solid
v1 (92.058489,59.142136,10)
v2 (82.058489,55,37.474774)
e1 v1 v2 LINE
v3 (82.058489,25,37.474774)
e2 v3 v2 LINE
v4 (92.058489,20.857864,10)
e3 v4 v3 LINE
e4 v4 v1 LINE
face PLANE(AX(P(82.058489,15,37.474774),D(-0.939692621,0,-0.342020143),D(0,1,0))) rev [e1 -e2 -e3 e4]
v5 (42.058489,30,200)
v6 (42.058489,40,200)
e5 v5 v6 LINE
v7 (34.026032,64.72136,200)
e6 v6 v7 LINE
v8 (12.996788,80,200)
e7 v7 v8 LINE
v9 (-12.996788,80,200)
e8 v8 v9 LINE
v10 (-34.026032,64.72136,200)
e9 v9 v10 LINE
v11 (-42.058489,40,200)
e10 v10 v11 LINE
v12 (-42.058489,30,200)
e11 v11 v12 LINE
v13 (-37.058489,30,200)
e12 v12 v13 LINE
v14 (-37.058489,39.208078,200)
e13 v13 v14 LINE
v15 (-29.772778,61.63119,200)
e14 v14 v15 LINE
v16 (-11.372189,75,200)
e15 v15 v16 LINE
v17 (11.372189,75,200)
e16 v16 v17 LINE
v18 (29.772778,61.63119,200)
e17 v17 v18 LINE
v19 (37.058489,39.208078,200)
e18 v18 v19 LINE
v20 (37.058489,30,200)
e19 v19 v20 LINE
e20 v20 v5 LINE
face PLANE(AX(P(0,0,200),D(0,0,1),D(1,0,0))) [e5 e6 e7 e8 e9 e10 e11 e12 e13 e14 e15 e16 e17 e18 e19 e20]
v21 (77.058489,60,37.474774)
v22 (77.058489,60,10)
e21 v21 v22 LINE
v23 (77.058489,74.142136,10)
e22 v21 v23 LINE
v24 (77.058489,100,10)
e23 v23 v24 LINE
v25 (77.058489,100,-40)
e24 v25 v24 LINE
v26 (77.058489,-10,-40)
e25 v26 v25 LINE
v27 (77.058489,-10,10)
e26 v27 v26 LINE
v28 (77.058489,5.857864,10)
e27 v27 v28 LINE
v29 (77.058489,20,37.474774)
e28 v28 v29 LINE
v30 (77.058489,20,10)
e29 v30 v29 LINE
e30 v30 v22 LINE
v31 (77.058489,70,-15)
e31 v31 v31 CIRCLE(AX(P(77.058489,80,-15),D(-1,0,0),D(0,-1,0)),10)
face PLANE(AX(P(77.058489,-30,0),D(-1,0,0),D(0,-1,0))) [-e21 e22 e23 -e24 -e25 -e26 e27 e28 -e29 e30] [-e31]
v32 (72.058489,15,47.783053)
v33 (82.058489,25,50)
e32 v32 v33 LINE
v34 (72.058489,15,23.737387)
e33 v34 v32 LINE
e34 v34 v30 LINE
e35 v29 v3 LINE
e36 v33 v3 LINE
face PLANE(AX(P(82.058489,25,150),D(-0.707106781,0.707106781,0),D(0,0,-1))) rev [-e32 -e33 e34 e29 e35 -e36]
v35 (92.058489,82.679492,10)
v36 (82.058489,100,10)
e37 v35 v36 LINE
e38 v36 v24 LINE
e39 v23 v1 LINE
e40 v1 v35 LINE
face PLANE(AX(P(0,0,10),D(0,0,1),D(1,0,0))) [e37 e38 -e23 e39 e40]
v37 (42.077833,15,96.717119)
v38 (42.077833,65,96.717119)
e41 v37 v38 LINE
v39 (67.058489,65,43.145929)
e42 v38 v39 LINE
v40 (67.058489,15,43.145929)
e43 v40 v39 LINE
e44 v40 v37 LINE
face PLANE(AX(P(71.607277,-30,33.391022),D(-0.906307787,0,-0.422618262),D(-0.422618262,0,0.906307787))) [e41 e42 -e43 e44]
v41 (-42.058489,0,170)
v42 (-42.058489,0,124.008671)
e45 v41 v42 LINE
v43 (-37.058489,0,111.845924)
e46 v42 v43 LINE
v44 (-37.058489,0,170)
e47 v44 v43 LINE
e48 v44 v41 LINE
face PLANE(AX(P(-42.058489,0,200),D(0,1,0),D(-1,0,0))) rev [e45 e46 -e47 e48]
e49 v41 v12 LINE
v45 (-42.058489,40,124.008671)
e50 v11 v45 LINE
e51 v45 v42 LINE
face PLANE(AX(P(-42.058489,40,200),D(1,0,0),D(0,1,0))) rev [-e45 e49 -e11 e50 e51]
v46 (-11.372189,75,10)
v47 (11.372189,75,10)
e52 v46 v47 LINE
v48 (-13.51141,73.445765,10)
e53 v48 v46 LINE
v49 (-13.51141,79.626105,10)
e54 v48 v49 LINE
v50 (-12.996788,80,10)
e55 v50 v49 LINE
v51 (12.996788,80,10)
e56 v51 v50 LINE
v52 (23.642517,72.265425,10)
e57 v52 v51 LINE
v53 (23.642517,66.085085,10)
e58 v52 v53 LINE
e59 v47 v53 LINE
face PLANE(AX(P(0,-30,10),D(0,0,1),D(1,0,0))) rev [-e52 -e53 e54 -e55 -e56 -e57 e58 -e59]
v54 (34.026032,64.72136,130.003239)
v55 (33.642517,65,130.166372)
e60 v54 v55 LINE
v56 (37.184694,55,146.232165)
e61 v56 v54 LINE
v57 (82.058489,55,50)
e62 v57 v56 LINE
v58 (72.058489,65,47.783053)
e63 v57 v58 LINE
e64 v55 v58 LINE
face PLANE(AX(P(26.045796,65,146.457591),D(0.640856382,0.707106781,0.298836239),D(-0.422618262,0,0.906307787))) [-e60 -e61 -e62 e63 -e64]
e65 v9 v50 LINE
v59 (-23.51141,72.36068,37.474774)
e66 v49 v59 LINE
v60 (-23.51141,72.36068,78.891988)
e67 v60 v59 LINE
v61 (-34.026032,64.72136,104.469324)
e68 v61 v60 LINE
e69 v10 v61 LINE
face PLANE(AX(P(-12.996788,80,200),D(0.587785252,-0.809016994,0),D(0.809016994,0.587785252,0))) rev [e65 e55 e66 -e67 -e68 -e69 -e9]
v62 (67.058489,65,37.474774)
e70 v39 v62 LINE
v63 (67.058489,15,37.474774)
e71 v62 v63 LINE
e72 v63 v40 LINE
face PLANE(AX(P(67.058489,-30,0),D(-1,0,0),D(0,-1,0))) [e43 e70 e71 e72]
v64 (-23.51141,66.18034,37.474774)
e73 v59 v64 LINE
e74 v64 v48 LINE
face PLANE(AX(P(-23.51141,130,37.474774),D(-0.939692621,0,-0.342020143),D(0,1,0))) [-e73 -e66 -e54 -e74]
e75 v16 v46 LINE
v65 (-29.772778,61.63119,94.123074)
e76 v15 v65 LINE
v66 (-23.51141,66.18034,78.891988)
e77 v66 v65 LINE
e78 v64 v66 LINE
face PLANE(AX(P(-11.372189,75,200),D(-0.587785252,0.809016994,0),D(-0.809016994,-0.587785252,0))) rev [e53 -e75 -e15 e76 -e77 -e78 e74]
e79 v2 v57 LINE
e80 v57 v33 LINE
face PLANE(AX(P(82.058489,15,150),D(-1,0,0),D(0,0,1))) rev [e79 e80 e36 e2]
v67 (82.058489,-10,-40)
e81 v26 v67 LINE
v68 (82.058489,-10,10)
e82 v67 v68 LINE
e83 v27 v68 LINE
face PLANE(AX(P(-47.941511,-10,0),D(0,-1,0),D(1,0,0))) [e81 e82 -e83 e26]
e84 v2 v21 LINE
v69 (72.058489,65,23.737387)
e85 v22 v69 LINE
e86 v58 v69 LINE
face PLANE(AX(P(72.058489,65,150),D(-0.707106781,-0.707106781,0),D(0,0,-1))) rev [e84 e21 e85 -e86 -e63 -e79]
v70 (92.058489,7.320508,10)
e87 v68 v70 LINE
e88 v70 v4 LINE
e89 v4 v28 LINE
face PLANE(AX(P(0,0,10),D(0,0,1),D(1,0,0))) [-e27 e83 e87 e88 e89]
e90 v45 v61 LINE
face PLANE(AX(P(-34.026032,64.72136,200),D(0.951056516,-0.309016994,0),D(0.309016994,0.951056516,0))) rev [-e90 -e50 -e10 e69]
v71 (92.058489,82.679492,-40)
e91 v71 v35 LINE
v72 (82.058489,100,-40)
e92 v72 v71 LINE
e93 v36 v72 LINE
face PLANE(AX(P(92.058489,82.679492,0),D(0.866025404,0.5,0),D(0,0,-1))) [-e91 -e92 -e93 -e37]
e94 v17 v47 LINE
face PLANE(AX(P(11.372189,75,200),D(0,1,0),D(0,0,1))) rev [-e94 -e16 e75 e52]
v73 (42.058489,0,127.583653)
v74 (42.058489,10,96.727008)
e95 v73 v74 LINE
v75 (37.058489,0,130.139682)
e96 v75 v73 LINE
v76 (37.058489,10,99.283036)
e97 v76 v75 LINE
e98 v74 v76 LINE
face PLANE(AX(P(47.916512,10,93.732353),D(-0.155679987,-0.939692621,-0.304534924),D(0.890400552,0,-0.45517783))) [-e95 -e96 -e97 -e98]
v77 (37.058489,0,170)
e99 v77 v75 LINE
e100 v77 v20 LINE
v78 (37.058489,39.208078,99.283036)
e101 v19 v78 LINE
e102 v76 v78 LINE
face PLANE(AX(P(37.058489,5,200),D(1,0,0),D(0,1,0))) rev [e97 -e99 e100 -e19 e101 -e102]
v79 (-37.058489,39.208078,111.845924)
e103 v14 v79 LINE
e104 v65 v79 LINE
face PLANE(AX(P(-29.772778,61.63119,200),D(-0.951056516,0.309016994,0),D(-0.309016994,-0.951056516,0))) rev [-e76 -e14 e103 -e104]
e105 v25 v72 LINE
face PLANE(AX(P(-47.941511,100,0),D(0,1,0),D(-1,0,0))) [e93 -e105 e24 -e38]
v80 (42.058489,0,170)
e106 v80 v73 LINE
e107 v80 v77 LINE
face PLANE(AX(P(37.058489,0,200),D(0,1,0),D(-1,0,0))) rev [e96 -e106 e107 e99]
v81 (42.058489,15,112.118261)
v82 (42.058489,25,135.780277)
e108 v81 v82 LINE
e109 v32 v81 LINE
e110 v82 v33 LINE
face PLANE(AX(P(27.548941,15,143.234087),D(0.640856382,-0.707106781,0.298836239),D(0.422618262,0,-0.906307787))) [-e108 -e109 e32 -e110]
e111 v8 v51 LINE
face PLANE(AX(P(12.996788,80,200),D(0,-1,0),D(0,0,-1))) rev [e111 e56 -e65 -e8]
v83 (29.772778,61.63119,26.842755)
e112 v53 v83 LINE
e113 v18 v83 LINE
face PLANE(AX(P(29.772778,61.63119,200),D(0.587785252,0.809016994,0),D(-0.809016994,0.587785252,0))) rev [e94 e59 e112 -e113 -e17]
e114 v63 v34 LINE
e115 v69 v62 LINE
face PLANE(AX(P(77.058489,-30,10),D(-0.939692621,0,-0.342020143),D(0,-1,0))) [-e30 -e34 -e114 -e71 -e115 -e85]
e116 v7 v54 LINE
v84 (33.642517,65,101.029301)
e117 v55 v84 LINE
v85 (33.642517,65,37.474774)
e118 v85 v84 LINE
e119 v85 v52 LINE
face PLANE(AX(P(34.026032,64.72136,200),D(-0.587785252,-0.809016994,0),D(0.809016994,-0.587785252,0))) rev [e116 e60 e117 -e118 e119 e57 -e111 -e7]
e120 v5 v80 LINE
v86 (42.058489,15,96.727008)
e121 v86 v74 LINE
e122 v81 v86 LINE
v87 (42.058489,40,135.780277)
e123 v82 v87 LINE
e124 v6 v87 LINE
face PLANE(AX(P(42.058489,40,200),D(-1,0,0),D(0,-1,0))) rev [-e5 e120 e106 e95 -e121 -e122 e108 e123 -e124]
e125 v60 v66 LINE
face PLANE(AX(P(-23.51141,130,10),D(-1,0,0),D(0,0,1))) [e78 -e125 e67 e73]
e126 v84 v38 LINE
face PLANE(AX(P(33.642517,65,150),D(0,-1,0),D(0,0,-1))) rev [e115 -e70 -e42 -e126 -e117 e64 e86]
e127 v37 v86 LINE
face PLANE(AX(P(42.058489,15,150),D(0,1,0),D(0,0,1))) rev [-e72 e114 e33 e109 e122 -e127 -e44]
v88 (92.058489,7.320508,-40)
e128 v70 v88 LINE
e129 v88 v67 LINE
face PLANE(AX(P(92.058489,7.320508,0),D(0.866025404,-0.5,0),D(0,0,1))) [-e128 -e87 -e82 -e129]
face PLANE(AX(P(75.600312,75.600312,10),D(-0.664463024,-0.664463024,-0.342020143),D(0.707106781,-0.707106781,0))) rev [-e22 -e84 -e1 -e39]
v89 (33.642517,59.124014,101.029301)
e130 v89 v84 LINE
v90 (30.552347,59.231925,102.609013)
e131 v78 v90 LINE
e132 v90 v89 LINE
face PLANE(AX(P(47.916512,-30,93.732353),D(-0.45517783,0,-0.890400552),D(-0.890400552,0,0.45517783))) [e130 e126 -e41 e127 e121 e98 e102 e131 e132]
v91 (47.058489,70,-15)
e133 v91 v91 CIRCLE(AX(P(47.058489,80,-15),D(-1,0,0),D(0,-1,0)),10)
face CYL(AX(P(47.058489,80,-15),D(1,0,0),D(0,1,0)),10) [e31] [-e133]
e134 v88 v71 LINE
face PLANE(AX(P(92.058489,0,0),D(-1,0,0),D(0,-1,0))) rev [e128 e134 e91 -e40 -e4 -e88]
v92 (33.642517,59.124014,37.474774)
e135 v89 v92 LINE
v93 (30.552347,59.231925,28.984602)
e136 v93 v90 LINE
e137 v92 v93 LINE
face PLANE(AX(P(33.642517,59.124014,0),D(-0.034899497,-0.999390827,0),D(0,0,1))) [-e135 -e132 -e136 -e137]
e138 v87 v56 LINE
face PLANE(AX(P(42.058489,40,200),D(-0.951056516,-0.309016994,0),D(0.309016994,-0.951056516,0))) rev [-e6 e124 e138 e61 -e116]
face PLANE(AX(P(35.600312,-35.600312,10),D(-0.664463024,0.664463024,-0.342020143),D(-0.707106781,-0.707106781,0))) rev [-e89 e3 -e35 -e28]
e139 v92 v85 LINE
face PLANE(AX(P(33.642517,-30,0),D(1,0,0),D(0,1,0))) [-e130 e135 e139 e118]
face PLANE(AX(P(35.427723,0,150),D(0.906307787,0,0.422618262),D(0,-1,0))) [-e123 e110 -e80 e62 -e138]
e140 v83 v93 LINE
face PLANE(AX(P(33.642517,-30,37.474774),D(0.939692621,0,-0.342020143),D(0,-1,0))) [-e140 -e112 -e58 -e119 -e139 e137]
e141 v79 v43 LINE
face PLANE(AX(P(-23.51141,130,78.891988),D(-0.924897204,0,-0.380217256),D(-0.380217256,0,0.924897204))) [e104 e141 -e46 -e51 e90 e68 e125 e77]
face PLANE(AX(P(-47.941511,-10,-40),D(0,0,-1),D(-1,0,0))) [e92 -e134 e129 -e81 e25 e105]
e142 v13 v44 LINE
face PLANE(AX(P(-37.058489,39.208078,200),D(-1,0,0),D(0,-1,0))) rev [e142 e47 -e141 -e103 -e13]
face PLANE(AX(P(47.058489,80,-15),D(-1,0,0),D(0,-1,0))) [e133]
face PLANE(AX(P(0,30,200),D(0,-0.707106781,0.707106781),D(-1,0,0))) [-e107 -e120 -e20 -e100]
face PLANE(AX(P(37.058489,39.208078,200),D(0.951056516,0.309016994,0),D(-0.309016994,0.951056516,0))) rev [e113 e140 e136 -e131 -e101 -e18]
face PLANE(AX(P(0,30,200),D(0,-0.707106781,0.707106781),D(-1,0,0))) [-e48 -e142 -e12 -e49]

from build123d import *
from OCP.BRepFilletAPI import BRepFilletAPI_MakeChamfer

# Parameters (mm, degrees)
BOSS_EXTRU_1_DEPTH      = 200
BOSS_EXTRU_2_DEPTH      = 50
BOSS_EXTRU_2_DEPTH_BACK = 90
ESQUISSE3_W             = 40
ESQUISSE3_H             = 110
BOSS_EXTRU_3_DEPTH      = 150
CHANFREIN1_SIZE         = 10
CHANFREIN1_SIZE2        = 17.320508076
CHANFREIN2_SIZE         = 100
CHANFREIN2_SIZE2        = 46.630765816
CHANFREIN3_SIZE         = 10
CHANFREIN4_SIZE         = 30
BOSS_EXTRU_4_DEPTH      = 10
ENL_V_MAT_EXTRU_1_DEPTH = 130
ESQUISSE7_R             = 10
BOSS_EXTRU_5_DEPTH      = 30
CHANFREIN5_SIZE         = 27.474774195
CHANFREIN5_SIZE_2       = 10
ENL_V_MAT_EXTRU_2_DEPTH = 130
CHANFREIN6_SIZE         = 10
CHANFREIN6_SIZE_2       = 27.474774195
CHANFREIN6_SIZE_3       = 9.402654051


# Some blends are built 0.0001 mm under size
with BuildPart() as part:
    # Esquisse1 → Boss.-Extru.1 (new body)
    with BuildSketch(Plane.XY):
        Polygon((-42.05848897, 40), (-42.05848897, 0), (-37.05848897, 0), (-37.05848897, 5), (-37.05848897, 39.208077798), (-29.772778292, 61.631189606), (-11.372189368, 75), (11.372189368, 75), (29.772778292, 61.631189606), (37.05848897, 39.208077798), (37.05848897, 5), (37.05848897, 0), (42.05848897, 0), (42.05848897, 40), (34.026032334, 64.72135955), (12.996787849, 80), (-12.996787849, 80), (-34.026032334, 64.72135955), align=None)
    extrude(amount=BOSS_EXTRU_1_DEPTH)

    # Esquisse3 → Boss.-Extru.2 (add, two sides: drawn at the far end of the back side and taken through both)
    with BuildSketch(Plane(origin=(42.05848897, 0, 0), x_dir=(0, 0, -1), z_dir=(1, 0, 0)).offset(-BOSS_EXTRU_2_DEPTH_BACK)):
        with Locations((20, 45)):
            Rectangle(ESQUISSE3_W, ESQUISSE3_H)
    extrude(amount=BOSS_EXTRU_2_DEPTH + BOSS_EXTRU_2_DEPTH_BACK)

    # Esquisse4 → Boss.-Extru.3 (add)
    with BuildSketch(Plane.XY):
        Polygon((42.05848897, 40), (42.05848897, 15), (82.05848897, 15), (82.05848897, 65), (33.642516656, 65), (34.026032334, 64.72135955), align=None)
    extrude(amount=BOSS_EXTRU_3_DEPTH)

    # Chanfrein1: one chamfer whose edges measure the first distance from different faces: ONE call of the kernel's chamfer builder (chamfer() names one face for all edges)
    chanfrein1_edges_1 = [part.edges().sort_by_distance(p)[0] for p in [
        (92.05848897, -10, -20),
    ]]
    chanfrein1_side_1 = [part.faces().sort_by_distance(p)[0] for p in [
        (22.05848897, -10, -20),
    ]]
    chanfrein1_edges_2 = [part.edges().sort_by_distance(p)[0] for p in [
        (92.05848897, 100, -20),
    ]]
    chanfrein1_side_2 = [part.faces().sort_by_distance(p)[0] for p in [
        (22.05848897, 100, -20),
    ]]
    chanfrein1 = BRepFilletAPI_MakeChamfer(part.part.solid().wrapped)
    for e in chanfrein1_edges_1:
        chanfrein1.Add(CHANFREIN1_SIZE, CHANFREIN1_SIZE2, e.wrapped, chanfrein1_side_1[0].wrapped)  # the first distance lies on this face
    for e in chanfrein1_edges_2:
        chanfrein1.Add(CHANFREIN1_SIZE, CHANFREIN1_SIZE2, e.wrapped, chanfrein1_side_2[0].wrapped)  # the first distance lies on this face
    add(Compound.cast(chanfrein1.Shape()), mode=Mode.REPLACE)

    # Chanfrein2
    chanfrein2_edges = [part.edges().sort_by_distance(p)[0] for p in [
        (82.05848897, 40, 150),
    ]]
    chanfrein2_side = [part.faces().sort_by_distance(p)[0] for p in [
        (82.05848897, 40, 75),
    ]]
    chamfer(chanfrein2_edges, length=CHANFREIN2_SIZE, length2=CHANFREIN2_SIZE2, reference=chanfrein2_side[0])

    # Chanfrein3
    # the kernel refuses this chamfer: 10 mm, written as the material it takes off along each edge
    with BuildSketch(Plane(origin=(92.926890911, 15, 26.692636822), x_dir=(0.02491972708357348, 0.9996219169112968, 0.011620259578202877), z_dir=(-0.4226182617407005, 0, 0.9063077870366495))) as chanfrein3_piece_1_section:
        Polygon((CHANFREIN3_SIZE * 0.999621916911, CHANFREIN3_SIZE * 0.0274958766106), (-CHANFREIN3_SIZE * 0.0274958766106, CHANFREIN3_SIZE * 0.999621916911), (0, 0), align=None)
    chanfrein3_piece_1 = extrude(amount=146.081723085, mode=Mode.PRIVATE)
    chanfrein3_piece_1 = split(chanfrein3_piece_1, bisect_by=Plane(origin=(42.05848897, 18.333333333, 85.0027998), z_dir=(1, 0, 0)), keep=Keep.TOP, mode=Mode.PRIVATE)
    add(chanfrein3_piece_1, mode=Mode.SUBTRACT)
    with BuildSketch(Plane(origin=(82.05848897, 15, 0), x_dir=(0.027495876610586334, 0.9996219169112968, 0), z_dir=(0, 0, 1)), Plane(origin=(82.05848897, 65, 0), x_dir=(-0.9996219169112968, 0.027495876610586317, 0), z_dir=(0, 0, 1))) as chanfrein3_piece_2:
        Polygon((CHANFREIN3_SIZE * 0.999621916911, CHANFREIN3_SIZE * 0.0274958766106), (-CHANFREIN3_SIZE * 0.0274958766106, CHANFREIN3_SIZE * 0.999621916911), (0, 0), align=None)
    extrude(amount=75.71682988, mode=Mode.SUBTRACT)
    with BuildSketch(Plane(origin=(61.144553034, 65, 150), x_dir=(0, 0.027495876610586282, -0.9996219169112968), z_dir=(-1, 0, 0))) as chanfrein3_piece_3_section:
        Polygon((CHANFREIN3_SIZE * 0.999621916911, CHANFREIN3_SIZE * 0.0274958766106), (-CHANFREIN3_SIZE * 0.0274958766106, CHANFREIN3_SIZE * 0.999621916911), (0, 0), align=None)
    chanfrein3_piece_3 = extrude(amount=53.218866257, mode=Mode.PRIVATE)
    chanfrein3_piece_3 = split(chanfrein3_piece_3, bisect_by=Plane(origin=(34.447587874, 63.423945004, 144.130905286), z_dir=(0.9510565162951539, 0.3090169943749468, 0)), keep=Keep.TOP, mode=Mode.PRIVATE)
    add(chanfrein3_piece_3, mode=Mode.SUBTRACT)
    with BuildSketch(Plane(origin=(61.144553034, 65, 150), x_dir=(0, 0.027495876610586282, -0.9996219169112968), z_dir=(-1, 0, 0))) as chanfrein3_piece_4_section:
        Polygon((CHANFREIN3_SIZE * 0.999621916911, CHANFREIN3_SIZE * 0.0274958766106), (-CHANFREIN3_SIZE * 0.0274958766106, CHANFREIN3_SIZE * 0.999621916911), (0, 0), align=None)
    chanfrein3_piece_4 = extrude(amount=53.218866257, mode=Mode.PRIVATE)
    chanfrein3_piece_4 = split(chanfrein3_piece_4, bisect_by=Plane(origin=(33.833825058, 64.86100631, 145.046222385), z_dir=(0.5877852522924745, 0.8090169943749465, 0)), keep=Keep.TOP, mode=Mode.PRIVATE)
    add(chanfrein3_piece_4, mode=Mode.SUBTRACT)
    with BuildSketch(Plane(origin=(92.926890911, 65, 26.692636822), x_dir=(-0.9059651273892109, 0.027495876610586337, -0.4224584769229591), z_dir=(-0.4226182617407005, 0, 0.9063077870366495))) as chanfrein3_piece_5_section:
        Polygon((CHANFREIN3_SIZE * 0.999621916911, CHANFREIN3_SIZE * 0.0274958766106), (-CHANFREIN3_SIZE * 0.0274958766106, CHANFREIN3_SIZE * 0.999621916911), (0, 0), align=None)
    chanfrein3_piece_5 = extrude(amount=161.771451656, mode=Mode.PRIVATE)
    chanfrein3_piece_5 = split(chanfrein3_piece_5, bisect_by=Plane(origin=(37.356602315, 54.470919151, 89.132837903), z_dir=(0.9510565162951539, 0.3090169943749468, 0)), keep=Keep.TOP, mode=Mode.PRIVATE)
    add(chanfrein3_piece_5, mode=Mode.SUBTRACT)
    with BuildSketch(Plane(origin=(92.926890911, 65, 26.692636822), x_dir=(-0.9059651273892109, 0.027495876610586337, -0.4224584769229591), z_dir=(-0.4226182617407005, 0, 0.9063077870366495))) as chanfrein3_piece_6_section:
        Polygon((CHANFREIN3_SIZE * 0.999621916911, CHANFREIN3_SIZE * 0.0274958766106), (-CHANFREIN3_SIZE * 0.0274958766106, CHANFREIN3_SIZE * 0.999621916911), (0, 0), align=None)
    chanfrein3_piece_6 = extrude(amount=161.771451656, mode=Mode.PRIVATE)
    chanfrein3_piece_6 = split(chanfrein3_piece_6, bisect_by=Plane(origin=(33.834404205, 64.860585536, 139.950840197), z_dir=(0.5877852522924745, 0.8090169943749465, 0)), keep=Keep.TOP, mode=Mode.PRIVATE)
    add(chanfrein3_piece_6, mode=Mode.SUBTRACT)

    # Chanfrein4
    chanfrein4_edges = [part.edges().sort_by_distance(p)[0] for p in [
        (-39.55848897, 0, 200),
        (39.55848897, 0, 200),
    ]]
    chamfer(chanfrein4_edges, length=CHANFREIN4_SIZE)

    # Esquisse6 → Boss.-Extru.4 (add)
    with BuildSketch(Plane.XY):
        Polygon((-47.94151103, -10), (82.05848897, -10), (92.05848897, 7.320508076), (92.05848897, 82.679491924), (82.05848897, 100), (-47.94151103, 100), align=None)
    extrude(amount=BOSS_EXTRU_4_DEPTH)

    # Esquisse5 → Enlèv. mat.-Extru.1 (cut)
    with BuildSketch(Plane(origin=(0, 100, 0), x_dir=(1, 0, 0), z_dir=(0, 1, 0))):
        Polygon((77.05848897, -10), (77.05848897, 40), (-47.94151103, 40), (-47.94151103, -10), (33.642516656, -10), (67.05848897, -10), align=None)
        Polygon((67.05848897, -43.145928791), (67.05848897, -10), (33.642516656, -10), (33.642516656, -101.029300724), (42.077832628, -96.717119194), align=None)
    extrude(amount=-ENL_V_MAT_EXTRU_1_DEPTH, mode=Mode.SUBTRACT)

    # Esquisse7 → Boss.-Extru.5 (add)
    with BuildSketch(Plane.ZY.offset(-77.05848897)):
        with Locations(Location((-15, 80, 0), (0, 0, 270))):
            Circle(ESQUISSE7_R)
    extrude(amount=BOSS_EXTRU_5_DEPTH)

    # Chanfrein5
    chanfrein5_edges_1 = [part.edges().sort_by_distance(p)[0] for p in [
        (79.55848897, 22.5, 10),
    ]]
    chanfrein5_side_1 = [part.faces().sort_by_distance(p)[0] for p in [
        (79.55848897, 22.5, 10.2),
    ]]
    chanfrein5_edges_2 = [part.edges().sort_by_distance(p)[0] for p in [
        (82.05848897, 40, 10),
    ]]
    chanfrein5_side_2 = [part.faces().sort_by_distance(p)[0] for p in [
        (82.05848897, 40, 10.2),
    ]]
    chanfrein5_edges_3 = [part.edges().sort_by_distance(p)[0] for p in [
        (79.55848897, 57.5, 10),
    ]]
    chanfrein5_side_3 = [part.faces().sort_by_distance(p)[0] for p in [
        (79.55848897, 57.5, 10.2),
    ]]
    chanfrein5_edges_4 = [part.edges().sort_by_distance(p)[0] for p in [
        (67.05848897, 40, 10),
    ]]
    chanfrein5_side_4 = [part.faces().sort_by_distance(p)[0] for p in [
        (67.25848897, 40, 10),
    ]]
    chanfrein5 = BRepFilletAPI_MakeChamfer(part.part.solid().wrapped)
    for e in chanfrein5_edges_1:
        chanfrein5.Add(CHANFREIN5_SIZE - 0.0001, CHANFREIN5_SIZE_2 - 0.0001, e.wrapped, chanfrein5_side_1[0].wrapped)
    for e in chanfrein5_edges_2:
        chanfrein5.Add(CHANFREIN5_SIZE - 0.0001, CHANFREIN5_SIZE_2 - 0.0001, e.wrapped, chanfrein5_side_2[0].wrapped)
    for e in chanfrein5_edges_3:
        chanfrein5.Add(CHANFREIN5_SIZE - 0.0001, CHANFREIN5_SIZE_2 - 0.0001, e.wrapped, chanfrein5_side_3[0].wrapped)
    for e in chanfrein5_edges_4:
        chanfrein5.Add(CHANFREIN5_SIZE_2 - 0.0001, CHANFREIN5_SIZE - 0.0001, e.wrapped, chanfrein5_side_4[0].wrapped)
    add(Compound.cast(chanfrein5.Shape()), mode=Mode.REPLACE)  # a hair under: the kernel refuses the full size

    # Esquisse8 → Enlèv. mat.-Extru.2 (cut)
    with BuildSketch(Plane(origin=(0, 0, 0), x_dir=(1, 0, 0), z_dir=(0, 1, 0))):
        Polygon((-23.511410092, -10), (-23.511410092, -78.891987617), (-42.05848897, -124.008670609), (-42.05848897, -10), align=None)
    extrude(amount=ENL_V_MAT_EXTRU_2_DEPTH, mode=Mode.SUBTRACT)

    # Chanfrein6
    # the kernel refuses this chamfer: 27.474774195, 10, 9.402654051 mm, written as the material it takes off along each edge
    with BuildSketch(Plane(origin=(-23.511410092, -5.094574606, 10), x_dir=(0.9950833631817486, 0, -0.09904090225205081), z_dir=(0, 1, 0))) as chanfrein6_piece_1:
        Polygon((CHANFREIN6_SIZE * 0.995083363182, -CHANFREIN6_SIZE * 0.0990409022521), (-CHANFREIN6_SIZE_2 * 0.0990409022504, -CHANFREIN6_SIZE_2 * 0.995083363165), (0, 0), align=None)
    extrude(amount=148.730168875, mode=Mode.SUBTRACT)
    with BuildSketch(Plane(origin=(33.642516656, 136.274914494, 10), x_dir=(0.01318405819864584, 0, 0.9999130865277315), z_dir=(0, -1, 0))) as chanfrein6_piece_2:
        Polygon((CHANFREIN6_SIZE_2 * 0.999913086511, CHANFREIN6_SIZE_2 * 0.0131840581984), (-CHANFREIN6_SIZE * 0.0131840581986, CHANFREIN6_SIZE * 0.999913086528), (0, 0), align=None)
    extrude(amount=157.828469437, mode=Mode.SUBTRACT)
    with BuildSketch(Plane(origin=(-26.404734257, 0, 131.72579712), x_dir=(-0.04508122292734055, 0.9950833631817486, -0.08818607406090614), z_dir=(0.8904005522534487, -1.452228809103749e-15, -0.455177829586145))) as chanfrein6_piece_3:
        Polygon((CHANFREIN6_SIZE * 0.995083363182, CHANFREIN6_SIZE * 0.0990409022521), (-CHANFREIN6_SIZE_2 * 0.0990409022504, CHANFREIN6_SIZE_2 * 0.995083363165), (0, 0), align=None)
    extrude(amount=148.165279233, mode=Mode.SUBTRACT)
    # the kernel refuses this chamfer: 27.474774195, 10, 9.402654051 mm, written as the material it takes off along each edge
    with BuildSketch(Plane(origin=(33.642516656, 49.72135955, 12.11533794), x_dir=(-0.34404612147903313, 0.9389527497671193, 0), z_dir=(0, 0, 1))) as chanfrein6_2_piece_1_section:
        Polygon((CHANFREIN6_SIZE * 0.999313229545, -CHANFREIN6_SIZE * 0.0370549491456), (CHANFREIN6_SIZE_3 * 0.938952749733, -CHANFREIN6_SIZE_3 * 0.344046121466), (0, 0), align=None)
    chanfrein6_2_piece_1 = extrude(amount=114.273399039, mode=Mode.PRIVATE)
    chanfrein6_2_piece_1 = split(chanfrein6_2_piece_1, bisect_by=Plane(origin=(50.743372859, 55.917594233, 92.287245712), z_dir=(-0.455177829586145, 0, -0.8904005522534487)), keep=Keep.TOP, mode=Mode.PRIVATE)
    add(chanfrein6_2_piece_1, mode=Mode.SUBTRACT)


solid = part.part
